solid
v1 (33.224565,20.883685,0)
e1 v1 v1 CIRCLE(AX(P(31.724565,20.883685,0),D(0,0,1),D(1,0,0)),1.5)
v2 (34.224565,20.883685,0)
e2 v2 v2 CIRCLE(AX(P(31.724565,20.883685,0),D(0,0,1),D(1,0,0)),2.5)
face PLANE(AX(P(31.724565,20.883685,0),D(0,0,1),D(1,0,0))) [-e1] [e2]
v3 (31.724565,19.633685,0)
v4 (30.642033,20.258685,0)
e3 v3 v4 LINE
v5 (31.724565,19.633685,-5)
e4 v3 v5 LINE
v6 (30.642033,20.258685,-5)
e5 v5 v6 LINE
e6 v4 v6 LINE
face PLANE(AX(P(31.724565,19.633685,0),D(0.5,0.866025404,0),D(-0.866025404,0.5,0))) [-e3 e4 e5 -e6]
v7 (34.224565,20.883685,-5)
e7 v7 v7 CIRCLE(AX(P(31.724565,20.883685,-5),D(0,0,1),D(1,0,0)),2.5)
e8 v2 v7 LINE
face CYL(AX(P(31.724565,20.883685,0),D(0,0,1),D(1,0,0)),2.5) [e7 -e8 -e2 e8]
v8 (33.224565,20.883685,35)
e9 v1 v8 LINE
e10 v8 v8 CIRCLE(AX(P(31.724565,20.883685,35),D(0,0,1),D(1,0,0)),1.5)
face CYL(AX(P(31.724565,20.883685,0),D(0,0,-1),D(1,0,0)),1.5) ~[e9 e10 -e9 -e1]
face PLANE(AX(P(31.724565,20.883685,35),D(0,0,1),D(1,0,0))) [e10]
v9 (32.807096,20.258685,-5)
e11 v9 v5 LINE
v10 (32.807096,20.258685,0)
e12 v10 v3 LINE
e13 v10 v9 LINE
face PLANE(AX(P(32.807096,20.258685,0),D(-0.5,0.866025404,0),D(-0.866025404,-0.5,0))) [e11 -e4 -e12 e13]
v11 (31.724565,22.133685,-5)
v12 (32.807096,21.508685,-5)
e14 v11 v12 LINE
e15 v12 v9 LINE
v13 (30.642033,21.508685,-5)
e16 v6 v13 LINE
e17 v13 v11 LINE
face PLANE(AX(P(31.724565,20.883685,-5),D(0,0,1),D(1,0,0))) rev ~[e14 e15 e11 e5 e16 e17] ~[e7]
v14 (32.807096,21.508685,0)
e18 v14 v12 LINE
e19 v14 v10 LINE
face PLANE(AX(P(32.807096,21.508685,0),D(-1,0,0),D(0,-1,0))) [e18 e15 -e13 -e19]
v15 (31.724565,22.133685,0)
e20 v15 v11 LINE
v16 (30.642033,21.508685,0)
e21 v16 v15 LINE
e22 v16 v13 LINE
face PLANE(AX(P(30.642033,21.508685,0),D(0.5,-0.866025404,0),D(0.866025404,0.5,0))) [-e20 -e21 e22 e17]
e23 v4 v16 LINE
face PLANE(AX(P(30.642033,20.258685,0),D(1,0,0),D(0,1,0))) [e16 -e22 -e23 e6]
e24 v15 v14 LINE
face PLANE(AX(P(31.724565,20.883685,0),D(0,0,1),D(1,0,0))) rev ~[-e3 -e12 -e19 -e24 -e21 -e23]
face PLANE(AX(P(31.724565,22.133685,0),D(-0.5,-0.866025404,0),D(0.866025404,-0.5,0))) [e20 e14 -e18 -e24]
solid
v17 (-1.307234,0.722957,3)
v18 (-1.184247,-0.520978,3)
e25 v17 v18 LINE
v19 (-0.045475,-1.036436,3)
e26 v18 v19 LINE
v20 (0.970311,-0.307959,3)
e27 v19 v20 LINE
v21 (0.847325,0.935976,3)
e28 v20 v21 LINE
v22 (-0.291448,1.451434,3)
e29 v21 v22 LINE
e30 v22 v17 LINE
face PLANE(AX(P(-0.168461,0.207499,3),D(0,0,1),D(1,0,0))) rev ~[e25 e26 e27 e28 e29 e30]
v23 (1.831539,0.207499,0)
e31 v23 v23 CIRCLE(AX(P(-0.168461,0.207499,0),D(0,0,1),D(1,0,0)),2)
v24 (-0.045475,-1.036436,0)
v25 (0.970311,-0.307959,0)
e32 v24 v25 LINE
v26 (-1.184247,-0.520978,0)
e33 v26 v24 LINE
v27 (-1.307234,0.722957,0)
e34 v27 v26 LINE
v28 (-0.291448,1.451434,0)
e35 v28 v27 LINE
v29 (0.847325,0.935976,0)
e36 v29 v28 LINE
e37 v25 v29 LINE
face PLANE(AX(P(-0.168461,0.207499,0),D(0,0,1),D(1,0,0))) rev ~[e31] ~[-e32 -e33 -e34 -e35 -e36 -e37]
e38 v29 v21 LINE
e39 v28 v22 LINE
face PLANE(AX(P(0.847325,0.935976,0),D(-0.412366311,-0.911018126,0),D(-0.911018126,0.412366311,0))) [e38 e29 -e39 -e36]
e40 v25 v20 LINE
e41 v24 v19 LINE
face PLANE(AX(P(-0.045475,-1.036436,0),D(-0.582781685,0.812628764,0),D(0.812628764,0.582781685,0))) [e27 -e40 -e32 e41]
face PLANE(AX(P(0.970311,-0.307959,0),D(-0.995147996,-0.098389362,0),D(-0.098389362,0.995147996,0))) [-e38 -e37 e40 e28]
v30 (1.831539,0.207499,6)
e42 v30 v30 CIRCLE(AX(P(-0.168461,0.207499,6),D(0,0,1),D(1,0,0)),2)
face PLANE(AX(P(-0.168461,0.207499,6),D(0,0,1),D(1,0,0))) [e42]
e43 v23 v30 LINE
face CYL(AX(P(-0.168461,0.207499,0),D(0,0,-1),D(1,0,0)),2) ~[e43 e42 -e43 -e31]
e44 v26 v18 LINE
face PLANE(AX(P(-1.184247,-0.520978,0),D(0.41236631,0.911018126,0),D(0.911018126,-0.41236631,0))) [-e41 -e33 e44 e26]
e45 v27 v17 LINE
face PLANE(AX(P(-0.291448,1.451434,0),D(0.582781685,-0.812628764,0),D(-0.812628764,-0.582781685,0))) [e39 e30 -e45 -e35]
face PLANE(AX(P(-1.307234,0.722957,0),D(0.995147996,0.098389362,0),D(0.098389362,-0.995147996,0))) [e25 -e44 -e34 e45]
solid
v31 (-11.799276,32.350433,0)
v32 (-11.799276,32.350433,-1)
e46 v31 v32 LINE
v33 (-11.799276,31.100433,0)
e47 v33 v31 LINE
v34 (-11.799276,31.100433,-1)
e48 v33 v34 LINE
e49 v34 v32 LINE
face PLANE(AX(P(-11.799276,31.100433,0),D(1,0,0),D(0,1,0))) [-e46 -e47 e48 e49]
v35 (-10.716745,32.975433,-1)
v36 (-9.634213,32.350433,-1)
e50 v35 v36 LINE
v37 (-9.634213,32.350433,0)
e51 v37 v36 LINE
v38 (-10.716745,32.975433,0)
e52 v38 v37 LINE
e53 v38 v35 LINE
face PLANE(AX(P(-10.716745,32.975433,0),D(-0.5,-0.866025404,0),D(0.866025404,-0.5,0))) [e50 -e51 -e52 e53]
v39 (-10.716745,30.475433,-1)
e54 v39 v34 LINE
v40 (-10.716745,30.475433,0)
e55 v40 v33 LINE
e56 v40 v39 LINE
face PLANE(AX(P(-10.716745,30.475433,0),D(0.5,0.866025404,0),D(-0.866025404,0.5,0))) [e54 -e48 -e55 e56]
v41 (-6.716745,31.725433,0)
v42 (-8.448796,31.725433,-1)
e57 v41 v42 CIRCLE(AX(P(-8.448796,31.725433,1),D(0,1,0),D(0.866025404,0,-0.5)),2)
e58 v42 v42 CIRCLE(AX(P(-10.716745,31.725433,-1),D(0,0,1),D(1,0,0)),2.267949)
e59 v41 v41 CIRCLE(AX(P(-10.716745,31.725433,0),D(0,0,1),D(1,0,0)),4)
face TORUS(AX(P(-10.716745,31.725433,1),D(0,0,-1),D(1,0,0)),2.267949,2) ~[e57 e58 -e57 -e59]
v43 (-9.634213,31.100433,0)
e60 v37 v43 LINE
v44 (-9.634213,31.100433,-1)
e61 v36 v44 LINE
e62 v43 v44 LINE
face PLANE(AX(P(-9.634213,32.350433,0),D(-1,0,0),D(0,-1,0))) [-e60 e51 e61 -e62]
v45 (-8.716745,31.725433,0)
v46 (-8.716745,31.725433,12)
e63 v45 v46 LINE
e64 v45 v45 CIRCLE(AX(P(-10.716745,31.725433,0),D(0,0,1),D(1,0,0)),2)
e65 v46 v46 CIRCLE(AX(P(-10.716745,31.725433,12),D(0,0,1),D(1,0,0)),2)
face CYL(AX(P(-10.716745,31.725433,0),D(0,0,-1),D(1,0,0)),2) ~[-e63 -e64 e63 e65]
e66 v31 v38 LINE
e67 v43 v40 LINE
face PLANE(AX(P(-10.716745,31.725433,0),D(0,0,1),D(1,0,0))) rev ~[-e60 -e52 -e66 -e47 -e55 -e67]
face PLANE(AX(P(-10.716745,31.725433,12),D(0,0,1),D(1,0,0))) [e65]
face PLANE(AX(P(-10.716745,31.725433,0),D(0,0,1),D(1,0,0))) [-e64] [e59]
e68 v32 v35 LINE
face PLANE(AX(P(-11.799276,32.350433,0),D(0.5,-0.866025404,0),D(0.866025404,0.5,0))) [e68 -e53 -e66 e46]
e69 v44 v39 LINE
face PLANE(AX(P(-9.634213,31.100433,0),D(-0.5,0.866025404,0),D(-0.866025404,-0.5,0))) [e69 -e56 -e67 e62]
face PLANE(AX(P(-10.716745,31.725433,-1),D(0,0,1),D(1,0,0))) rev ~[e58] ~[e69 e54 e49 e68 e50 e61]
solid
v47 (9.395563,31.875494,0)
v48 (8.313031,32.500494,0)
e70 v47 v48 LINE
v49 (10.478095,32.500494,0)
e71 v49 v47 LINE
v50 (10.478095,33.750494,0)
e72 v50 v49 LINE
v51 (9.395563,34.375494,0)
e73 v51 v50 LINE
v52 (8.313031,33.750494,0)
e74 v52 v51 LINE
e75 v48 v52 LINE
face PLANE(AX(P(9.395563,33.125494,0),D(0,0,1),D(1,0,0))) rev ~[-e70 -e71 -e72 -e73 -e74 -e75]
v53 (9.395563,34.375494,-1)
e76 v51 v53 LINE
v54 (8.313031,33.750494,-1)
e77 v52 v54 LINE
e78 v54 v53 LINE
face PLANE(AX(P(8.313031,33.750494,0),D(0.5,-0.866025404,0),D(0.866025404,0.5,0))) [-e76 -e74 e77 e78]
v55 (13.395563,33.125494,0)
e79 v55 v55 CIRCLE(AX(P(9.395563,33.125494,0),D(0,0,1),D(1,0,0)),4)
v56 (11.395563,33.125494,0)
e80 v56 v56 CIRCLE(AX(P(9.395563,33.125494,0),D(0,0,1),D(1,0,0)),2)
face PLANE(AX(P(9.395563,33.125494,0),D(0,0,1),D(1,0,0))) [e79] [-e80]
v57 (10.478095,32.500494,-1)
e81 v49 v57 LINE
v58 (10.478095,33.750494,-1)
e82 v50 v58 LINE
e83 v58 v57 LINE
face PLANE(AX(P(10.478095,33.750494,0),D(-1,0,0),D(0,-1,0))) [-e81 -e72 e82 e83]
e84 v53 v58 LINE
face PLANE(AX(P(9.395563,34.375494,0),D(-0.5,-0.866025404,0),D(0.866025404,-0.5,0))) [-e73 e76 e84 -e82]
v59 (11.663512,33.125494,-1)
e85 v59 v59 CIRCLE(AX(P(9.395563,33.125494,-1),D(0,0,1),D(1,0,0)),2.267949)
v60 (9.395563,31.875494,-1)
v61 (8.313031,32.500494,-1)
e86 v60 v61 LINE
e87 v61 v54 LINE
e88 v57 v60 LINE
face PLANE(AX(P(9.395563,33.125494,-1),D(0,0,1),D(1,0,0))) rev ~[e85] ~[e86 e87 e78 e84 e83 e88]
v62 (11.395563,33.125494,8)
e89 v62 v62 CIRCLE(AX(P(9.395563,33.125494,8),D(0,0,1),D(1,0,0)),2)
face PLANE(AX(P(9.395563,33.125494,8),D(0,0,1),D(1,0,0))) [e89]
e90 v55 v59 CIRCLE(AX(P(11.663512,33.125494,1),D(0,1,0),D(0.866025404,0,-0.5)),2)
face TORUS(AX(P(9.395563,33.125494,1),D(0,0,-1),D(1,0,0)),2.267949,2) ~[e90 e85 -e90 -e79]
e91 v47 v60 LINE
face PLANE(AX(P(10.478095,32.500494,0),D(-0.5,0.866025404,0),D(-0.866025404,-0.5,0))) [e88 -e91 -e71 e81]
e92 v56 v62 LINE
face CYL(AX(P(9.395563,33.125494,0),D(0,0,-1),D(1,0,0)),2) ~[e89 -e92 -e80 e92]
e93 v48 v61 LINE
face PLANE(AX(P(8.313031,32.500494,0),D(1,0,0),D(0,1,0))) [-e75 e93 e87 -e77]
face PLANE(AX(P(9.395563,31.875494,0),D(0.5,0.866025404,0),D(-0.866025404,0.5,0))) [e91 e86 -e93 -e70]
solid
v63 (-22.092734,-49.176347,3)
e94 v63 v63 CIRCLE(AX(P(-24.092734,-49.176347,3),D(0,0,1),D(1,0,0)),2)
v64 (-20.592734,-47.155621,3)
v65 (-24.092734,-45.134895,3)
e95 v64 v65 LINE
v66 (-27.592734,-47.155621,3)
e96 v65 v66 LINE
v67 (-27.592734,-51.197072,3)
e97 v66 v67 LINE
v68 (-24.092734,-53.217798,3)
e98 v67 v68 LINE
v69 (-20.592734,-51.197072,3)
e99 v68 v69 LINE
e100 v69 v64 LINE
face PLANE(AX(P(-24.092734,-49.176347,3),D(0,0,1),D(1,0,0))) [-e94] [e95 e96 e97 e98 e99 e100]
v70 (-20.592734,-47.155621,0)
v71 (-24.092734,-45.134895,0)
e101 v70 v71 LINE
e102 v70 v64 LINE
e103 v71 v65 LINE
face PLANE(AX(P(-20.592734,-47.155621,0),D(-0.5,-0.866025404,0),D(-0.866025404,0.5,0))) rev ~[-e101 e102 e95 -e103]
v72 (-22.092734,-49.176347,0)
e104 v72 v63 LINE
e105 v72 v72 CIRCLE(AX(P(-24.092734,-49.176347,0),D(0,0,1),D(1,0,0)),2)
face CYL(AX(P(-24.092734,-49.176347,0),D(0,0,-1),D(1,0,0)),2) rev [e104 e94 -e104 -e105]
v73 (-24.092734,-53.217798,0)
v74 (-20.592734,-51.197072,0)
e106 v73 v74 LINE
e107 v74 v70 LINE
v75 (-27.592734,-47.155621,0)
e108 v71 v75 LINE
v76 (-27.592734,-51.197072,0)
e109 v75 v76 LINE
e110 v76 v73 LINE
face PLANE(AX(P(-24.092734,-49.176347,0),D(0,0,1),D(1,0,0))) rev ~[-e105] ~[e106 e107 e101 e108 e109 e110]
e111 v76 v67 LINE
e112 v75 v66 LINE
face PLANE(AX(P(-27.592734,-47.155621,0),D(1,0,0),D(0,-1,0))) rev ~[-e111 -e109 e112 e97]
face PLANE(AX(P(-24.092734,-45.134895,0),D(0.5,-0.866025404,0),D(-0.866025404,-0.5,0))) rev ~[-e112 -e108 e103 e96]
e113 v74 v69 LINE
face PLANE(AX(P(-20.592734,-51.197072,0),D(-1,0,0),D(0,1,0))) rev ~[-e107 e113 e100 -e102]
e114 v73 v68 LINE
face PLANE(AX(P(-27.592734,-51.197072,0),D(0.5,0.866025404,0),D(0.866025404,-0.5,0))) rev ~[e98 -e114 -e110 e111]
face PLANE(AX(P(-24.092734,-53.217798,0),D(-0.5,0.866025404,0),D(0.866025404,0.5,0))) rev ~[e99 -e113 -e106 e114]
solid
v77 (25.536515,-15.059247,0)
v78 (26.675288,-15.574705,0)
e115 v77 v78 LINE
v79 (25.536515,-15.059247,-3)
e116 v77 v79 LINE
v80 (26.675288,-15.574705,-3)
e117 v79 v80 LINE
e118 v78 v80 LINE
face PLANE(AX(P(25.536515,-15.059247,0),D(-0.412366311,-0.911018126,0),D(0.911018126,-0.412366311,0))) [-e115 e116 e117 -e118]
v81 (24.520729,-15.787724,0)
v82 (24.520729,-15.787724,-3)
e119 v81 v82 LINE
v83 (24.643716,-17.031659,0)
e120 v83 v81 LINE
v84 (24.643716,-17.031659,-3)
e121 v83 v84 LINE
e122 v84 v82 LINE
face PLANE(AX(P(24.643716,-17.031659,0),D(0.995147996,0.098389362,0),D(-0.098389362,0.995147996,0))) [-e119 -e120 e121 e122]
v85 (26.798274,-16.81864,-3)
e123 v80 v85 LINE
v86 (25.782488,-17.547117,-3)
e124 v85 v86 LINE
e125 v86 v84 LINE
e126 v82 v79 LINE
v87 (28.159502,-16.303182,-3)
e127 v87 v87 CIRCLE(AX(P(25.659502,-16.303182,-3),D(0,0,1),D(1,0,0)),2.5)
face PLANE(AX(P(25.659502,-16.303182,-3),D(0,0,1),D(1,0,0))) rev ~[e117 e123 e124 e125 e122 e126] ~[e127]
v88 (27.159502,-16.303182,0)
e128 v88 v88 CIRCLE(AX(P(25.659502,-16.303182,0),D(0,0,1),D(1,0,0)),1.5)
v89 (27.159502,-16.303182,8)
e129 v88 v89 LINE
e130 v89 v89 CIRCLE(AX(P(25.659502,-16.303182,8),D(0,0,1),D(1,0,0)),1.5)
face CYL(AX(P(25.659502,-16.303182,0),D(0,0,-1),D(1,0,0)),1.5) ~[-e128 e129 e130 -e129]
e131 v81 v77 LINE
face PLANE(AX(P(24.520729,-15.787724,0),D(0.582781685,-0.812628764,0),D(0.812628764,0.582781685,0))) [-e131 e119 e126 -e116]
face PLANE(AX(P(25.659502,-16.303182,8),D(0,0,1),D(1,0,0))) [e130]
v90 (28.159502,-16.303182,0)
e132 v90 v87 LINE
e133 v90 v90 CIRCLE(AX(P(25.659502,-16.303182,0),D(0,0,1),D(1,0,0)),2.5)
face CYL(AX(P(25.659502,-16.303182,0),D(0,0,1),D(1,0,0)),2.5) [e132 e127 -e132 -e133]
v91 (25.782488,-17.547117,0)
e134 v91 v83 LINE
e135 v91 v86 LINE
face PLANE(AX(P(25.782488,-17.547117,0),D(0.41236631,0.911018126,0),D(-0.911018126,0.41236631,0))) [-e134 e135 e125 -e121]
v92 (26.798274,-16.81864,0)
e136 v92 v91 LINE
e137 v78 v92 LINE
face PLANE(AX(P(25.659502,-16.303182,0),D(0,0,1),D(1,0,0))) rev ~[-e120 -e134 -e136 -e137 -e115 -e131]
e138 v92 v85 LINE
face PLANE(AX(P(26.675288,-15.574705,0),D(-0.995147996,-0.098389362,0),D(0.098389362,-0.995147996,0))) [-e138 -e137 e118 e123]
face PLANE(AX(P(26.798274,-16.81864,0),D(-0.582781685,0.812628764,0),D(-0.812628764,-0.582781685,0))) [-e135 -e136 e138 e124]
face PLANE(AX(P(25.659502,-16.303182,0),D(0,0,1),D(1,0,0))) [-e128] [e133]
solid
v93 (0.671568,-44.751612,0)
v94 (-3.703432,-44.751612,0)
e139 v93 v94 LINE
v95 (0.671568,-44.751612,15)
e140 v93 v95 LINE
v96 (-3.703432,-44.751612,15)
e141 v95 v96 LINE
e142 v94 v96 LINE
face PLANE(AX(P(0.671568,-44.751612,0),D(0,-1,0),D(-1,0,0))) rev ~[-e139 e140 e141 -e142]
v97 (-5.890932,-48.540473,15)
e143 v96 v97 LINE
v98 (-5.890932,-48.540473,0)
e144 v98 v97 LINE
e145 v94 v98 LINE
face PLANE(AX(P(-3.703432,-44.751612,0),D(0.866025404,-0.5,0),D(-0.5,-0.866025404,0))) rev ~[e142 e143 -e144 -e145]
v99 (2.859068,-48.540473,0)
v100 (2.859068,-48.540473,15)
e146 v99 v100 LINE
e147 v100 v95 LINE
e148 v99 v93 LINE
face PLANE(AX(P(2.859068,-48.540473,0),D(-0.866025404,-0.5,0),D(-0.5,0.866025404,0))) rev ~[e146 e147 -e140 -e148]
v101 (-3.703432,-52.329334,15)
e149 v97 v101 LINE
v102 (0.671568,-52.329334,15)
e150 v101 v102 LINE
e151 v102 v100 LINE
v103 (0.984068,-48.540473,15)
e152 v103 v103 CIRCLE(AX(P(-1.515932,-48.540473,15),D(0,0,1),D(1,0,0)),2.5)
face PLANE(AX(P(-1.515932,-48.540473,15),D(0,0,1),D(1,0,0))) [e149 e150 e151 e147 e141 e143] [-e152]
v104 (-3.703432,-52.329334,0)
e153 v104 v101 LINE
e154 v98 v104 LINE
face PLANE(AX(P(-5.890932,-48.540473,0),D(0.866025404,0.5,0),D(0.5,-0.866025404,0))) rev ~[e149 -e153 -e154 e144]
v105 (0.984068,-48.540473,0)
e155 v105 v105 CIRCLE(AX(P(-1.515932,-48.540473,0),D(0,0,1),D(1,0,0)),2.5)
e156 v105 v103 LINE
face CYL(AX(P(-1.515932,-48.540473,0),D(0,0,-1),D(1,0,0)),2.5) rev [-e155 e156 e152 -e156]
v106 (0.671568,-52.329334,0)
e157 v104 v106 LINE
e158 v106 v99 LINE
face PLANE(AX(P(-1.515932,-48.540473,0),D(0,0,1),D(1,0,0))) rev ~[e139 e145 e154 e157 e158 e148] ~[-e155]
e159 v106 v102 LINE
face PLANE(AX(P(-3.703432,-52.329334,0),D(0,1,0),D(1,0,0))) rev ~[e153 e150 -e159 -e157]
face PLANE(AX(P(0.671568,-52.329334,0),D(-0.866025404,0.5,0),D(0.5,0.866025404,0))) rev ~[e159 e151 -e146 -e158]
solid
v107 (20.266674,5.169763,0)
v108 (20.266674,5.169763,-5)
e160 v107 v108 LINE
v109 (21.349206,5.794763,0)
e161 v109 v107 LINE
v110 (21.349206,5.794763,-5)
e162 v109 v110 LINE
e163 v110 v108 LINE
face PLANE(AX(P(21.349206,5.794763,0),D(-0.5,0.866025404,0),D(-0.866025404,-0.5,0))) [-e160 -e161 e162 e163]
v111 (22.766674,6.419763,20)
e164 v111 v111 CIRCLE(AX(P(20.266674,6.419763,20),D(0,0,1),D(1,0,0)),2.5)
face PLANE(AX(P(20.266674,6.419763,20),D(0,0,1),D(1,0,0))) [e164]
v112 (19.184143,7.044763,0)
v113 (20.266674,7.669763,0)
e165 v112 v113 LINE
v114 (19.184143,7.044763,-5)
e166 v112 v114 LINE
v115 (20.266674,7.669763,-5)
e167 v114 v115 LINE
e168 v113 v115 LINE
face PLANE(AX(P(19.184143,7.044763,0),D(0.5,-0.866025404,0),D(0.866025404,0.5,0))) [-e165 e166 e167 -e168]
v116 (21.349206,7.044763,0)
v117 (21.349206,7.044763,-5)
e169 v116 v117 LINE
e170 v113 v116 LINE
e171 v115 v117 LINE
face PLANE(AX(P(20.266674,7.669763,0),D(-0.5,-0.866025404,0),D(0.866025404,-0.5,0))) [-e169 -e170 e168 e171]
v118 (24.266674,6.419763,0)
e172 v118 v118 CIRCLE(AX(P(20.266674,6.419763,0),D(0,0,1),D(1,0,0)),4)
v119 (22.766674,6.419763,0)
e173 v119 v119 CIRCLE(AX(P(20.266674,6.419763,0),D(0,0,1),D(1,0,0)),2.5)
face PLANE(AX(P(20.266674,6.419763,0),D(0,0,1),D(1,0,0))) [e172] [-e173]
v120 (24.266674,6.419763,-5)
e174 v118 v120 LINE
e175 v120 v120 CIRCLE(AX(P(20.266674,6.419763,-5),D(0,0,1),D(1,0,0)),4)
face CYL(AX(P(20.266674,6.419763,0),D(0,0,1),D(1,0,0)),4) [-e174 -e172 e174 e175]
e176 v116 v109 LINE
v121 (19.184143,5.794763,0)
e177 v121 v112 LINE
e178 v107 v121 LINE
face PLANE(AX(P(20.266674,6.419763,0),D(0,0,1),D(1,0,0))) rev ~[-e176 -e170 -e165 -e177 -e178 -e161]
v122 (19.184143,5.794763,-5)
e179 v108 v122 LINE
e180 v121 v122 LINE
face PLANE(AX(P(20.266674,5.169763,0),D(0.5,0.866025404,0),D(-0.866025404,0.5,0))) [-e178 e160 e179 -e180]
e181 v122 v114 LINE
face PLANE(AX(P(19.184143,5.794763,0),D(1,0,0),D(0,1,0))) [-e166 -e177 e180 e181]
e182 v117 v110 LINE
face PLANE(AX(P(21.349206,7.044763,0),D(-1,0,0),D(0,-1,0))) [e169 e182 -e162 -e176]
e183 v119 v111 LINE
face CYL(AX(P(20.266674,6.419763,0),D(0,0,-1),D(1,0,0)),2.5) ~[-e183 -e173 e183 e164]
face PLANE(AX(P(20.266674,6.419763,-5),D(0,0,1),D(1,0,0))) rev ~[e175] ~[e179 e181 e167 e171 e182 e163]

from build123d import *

# Parameters (mm, degrees)
F0_R      = 2
F1_DEPTH  = 6
F0_R_2    = 1.5
F2_DEPTH  = 8
F0_R_3    = 2.5
F3_DEPTH  = 3
F4_DEPTH  = 20
F0_R_4    = 4
F5_DEPTH  = 5
F6_DEPTH  = 3
F7_DEPTH  = 8
F8_DEPTH  = 1
F10_DEPTH = 35
F11_DEPTH = 3
F12_DEPTH = 12
F13_DEPTH = 15


# Not quite as in the source:
# - a fillet or chamfer that OpenCascade refuses, or shapes differently, is made with other operations: its cross-section is extruded or revolved along the edge and cut away or added


with BuildPart() as f1:
    # F0 (on Top) → F1 (new body)
    with BuildSketch(Plane.XY):
        with Locations((-0.1684613526, 0.2074986696)):
            Circle(F0_R)
        Polygon((-1.3072340101, 0.7229565578), (-0.2914480557, 1.4514336643), (0.8473246019, 0.9359757761), (0.970311305, -0.3079592185), (-0.0454746495, -1.036436325), (-1.1842473071, -0.5209784369), align=None, mode=Mode.SUBTRACT)
        Polygon((0.8473246019, 0.9359757761), (-0.2914480557, 1.4514336643), (-1.3072340101, 0.7229565578), (-1.1842473071, -0.5209784369), (-0.0454746495, -1.036436325), (0.970311305, -0.3079592185), align=None)
    extrude(amount=F1_DEPTH)

    # F0 (on Top) → F6 (cut)
    with BuildSketch(Plane.XY):
        Polygon((0.8473246019, 0.9359757761), (-0.2914480557, 1.4514336643), (-1.3072340101, 0.7229565578), (-1.1842473071, -0.5209784369), (-0.0454746495, -1.036436325), (0.970311305, -0.3079592185), align=None)
    extrude(amount=F6_DEPTH, mode=Mode.SUBTRACT)


with BuildPart() as f2:
    # F0 (on Top) → F2 (new body)
    with BuildSketch(Plane.XY):
        with Locations((25.6595015526, -16.3031816483)):
            Circle(F0_R_2)
        Polygon((24.520728895, -15.7877237601), (25.5365148495, -15.0592466536), (26.6752875071, -15.5747045418), (26.7982742101, -16.8186395364), (25.7824882557, -17.5471166429), (24.6437155981, -17.0316587548), align=None, mode=Mode.SUBTRACT)
        Polygon((26.6752875071, -15.5747045418), (25.5365148495, -15.0592466536), (24.520728895, -15.7877237601), (24.6437155981, -17.0316587548), (25.7824882557, -17.5471166429), (26.7982742101, -16.8186395364), align=None)
    extrude(amount=F2_DEPTH)

    # F0 (on Top) → F3 (join)
    with BuildSketch(Plane.XY):
        with Locations((25.6595015526, -16.3031816483)):
            Circle(F0_R_3)
        with Locations((25.6595015526, -16.3031816483)):
            Circle(F0_R_2, mode=Mode.SUBTRACT)
        with Locations((25.6595015526, -16.3031816483)):
            Circle(F0_R_2)
        Polygon((24.520728895, -15.7877237601), (25.5365148495, -15.0592466536), (26.6752875071, -15.5747045418), (26.7982742101, -16.8186395364), (25.7824882557, -17.5471166429), (24.6437155981, -17.0316587548), align=None, mode=Mode.SUBTRACT)
    extrude(amount=-F3_DEPTH)


with BuildPart() as f4:
    # F0 (on Top) → F4 (new body)
    with BuildSketch(Plane.XY):
        with Locations((20.266674459, 6.419762969)):
            Circle(F0_R_3)
        Polygon((19.1841427043, 7.044762969), (20.266674459, 7.669762969), (21.3492062137, 7.044762969), (21.3492062137, 5.794762969), (20.266674459, 5.169762969), (19.1841427043, 5.794762969), align=None, mode=Mode.SUBTRACT)
        Polygon((21.3492062137, 7.044762969), (20.266674459, 7.669762969), (19.1841427043, 7.044762969), (19.1841427043, 5.794762969), (20.266674459, 5.169762969), (21.3492062137, 5.794762969), align=None)
    extrude(amount=F4_DEPTH)

    # F0 (on Top) → F5 (join)
    with BuildSketch(Plane.XY):
        with Locations((20.266674459, 6.419762969)):
            Circle(F0_R_4)
        with Locations((20.266674459, 6.419762969)):
            Circle(F0_R_3, mode=Mode.SUBTRACT)
        with Locations((20.266674459, 6.419762969)):
            Circle(F0_R_3)
        Polygon((19.1841427043, 7.044762969), (20.266674459, 7.669762969), (21.3492062137, 7.044762969), (21.3492062137, 5.794762969), (20.266674459, 5.169762969), (19.1841427043, 5.794762969), align=None, mode=Mode.SUBTRACT)
    extrude(amount=-F5_DEPTH)


with BuildPart() as f5:
    # F0 (on Top) → F5, piece 2 (new body)
    with BuildSketch(Plane.XY):
        with Locations((31.7245647311, 20.8836849779)):
            Circle(F0_R_3)
        with Locations((31.7245647311, 20.8836849779)):
            Circle(F0_R_2, mode=Mode.SUBTRACT)
        with Locations((31.7245647311, 20.8836849779)):
            Circle(F0_R_2)
        Polygon((30.6420329764, 21.5086849779), (31.7245647311, 22.1336849779), (32.8070964859, 21.5086849779), (32.8070964859, 20.2586849779), (31.7245647311, 19.6336849779), (30.6420329764, 20.2586849779), align=None, mode=Mode.SUBTRACT)
    extrude(amount=-F5_DEPTH)

    # F0 (on Top) → F10 (join)
    with BuildSketch(Plane.XY):
        with Locations((31.7245647311, 20.8836849779)):
            Circle(F0_R_2)
        Polygon((30.6420329764, 21.5086849779), (31.7245647311, 22.1336849779), (32.8070964859, 21.5086849779), (32.8070964859, 20.2586849779), (31.7245647311, 19.6336849779), (30.6420329764, 20.2586849779), align=None, mode=Mode.SUBTRACT)
        Polygon((32.8070964859, 21.5086849779), (31.7245647311, 22.1336849779), (30.6420329764, 21.5086849779), (30.6420329764, 20.2586849779), (31.7245647311, 19.6336849779), (32.8070964859, 20.2586849779), align=None)
    extrude(amount=F10_DEPTH)


with BuildPart() as f7:
    # F0 (on Top) → F7 (new body)
    with BuildSketch(Plane.XY):
        with Locations((9.3955630437, 33.1254936755)):
            Circle(F0_R)
        Polygon((8.3130312889, 33.7504936755), (9.3955630437, 34.3754936755), (10.4780947984, 33.7504936755), (10.4780947984, 32.5004936755), (9.3955630437, 31.8754936755), (8.3130312889, 32.5004936755), align=None, mode=Mode.SUBTRACT)
        Polygon((10.4780947984, 33.7504936755), (9.3955630437, 34.3754936755), (8.3130312889, 33.7504936755), (8.3130312889, 32.5004936755), (9.3955630437, 31.8754936755), (10.4780947984, 32.5004936755), align=None)
    extrude(amount=F7_DEPTH)

    # F0 (on Top) → F8 (join)
    with BuildSketch(Plane.XY):
        with Locations((9.3955630437, 33.1254936755)):
            Circle(F0_R_4)
        with Locations((9.3955630437, 33.1254936755)):
            Circle(F0_R, mode=Mode.SUBTRACT)
        with Locations((9.3955630437, 33.1254936755)):
            Circle(F0_R)
        Polygon((8.3130312889, 33.7504936755), (9.3955630437, 34.3754936755), (10.4780947984, 33.7504936755), (10.4780947984, 32.5004936755), (9.3955630437, 31.8754936755), (8.3130312889, 32.5004936755), align=None, mode=Mode.SUBTRACT)
    extrude(amount=-F8_DEPTH)

    # F9: fillet of radius 2 on 1 edges, made by hand

    # F9_s1 → F9_t2 (revolve, cut)
    with BuildSketch(Plane.XZ.offset(-33.1254936755)):
        with BuildLine():
            ThreePointArc((13.3955630437, 0), (12.6635122361, -0.7320508076), (11.6635122361, -1))
            Line((11.6635122361, -1), (13.3955630437, -1))
            Line((13.3955630437, -1), (13.3955630437, 0))
        make_face()
    revolve(axis=Axis((9.3955630437, 33.1254936755, -1), (0, 0, 1)), mode=Mode.SUBTRACT)


with BuildPart() as f8:
    # F0 (on Top) → F8, piece 2 (new body)
    with BuildSketch(Plane.XY):
        with Locations((-10.7167446986, 31.7254327238)):
            Circle(F0_R_4)
        with Locations((-10.7167446986, 31.7254327238)):
            Circle(F0_R, mode=Mode.SUBTRACT)
        with Locations((-10.7167446986, 31.7254327238)):
            Circle(F0_R)
        Polygon((-11.7992764533, 32.3504327238), (-10.7167446986, 32.9754327238), (-9.6342129439, 32.3504327238), (-9.6342129439, 31.1004327238), (-10.7167446986, 30.4754327238), (-11.7992764533, 31.1004327238), align=None, mode=Mode.SUBTRACT)
    extrude(amount=-F8_DEPTH)

    # F9#2: fillet of radius 2 on 1 edges, made by hand

    # F9_2_s1 → F9_2_t2 (revolve, cut)
    with BuildSketch(Plane.XZ.offset(-31.7254327238)):
        with BuildLine():
            ThreePointArc((-6.7167446986, 0), (-7.4487955062, -0.7320508076), (-8.4487955062, -1))
            Line((-8.4487955062, -1), (-6.7167446986, -1))
            Line((-6.7167446986, -1), (-6.7167446986, 0))
        make_face()
    revolve(axis=Axis((-10.7167446986, 31.7254327238, -1), (0, 0, 1)), mode=Mode.SUBTRACT)

    # F0 (on Top) → F12 (join)
    with BuildSketch(Plane.XY):
        with Locations((-10.7167446986, 31.7254327238)):
            Circle(F0_R)
        Polygon((-11.7992764533, 32.3504327238), (-10.7167446986, 32.9754327238), (-9.6342129439, 32.3504327238), (-9.6342129439, 31.1004327238), (-10.7167446986, 30.4754327238), (-11.7992764533, 31.1004327238), align=None, mode=Mode.SUBTRACT)
        Polygon((-9.6342129439, 32.3504327238), (-10.7167446986, 32.9754327238), (-11.7992764533, 32.3504327238), (-11.7992764533, 31.1004327238), (-10.7167446986, 30.4754327238), (-9.6342129439, 31.1004327238), align=None)
    extrude(amount=F12_DEPTH)


with BuildPart() as f11:
    # F0 (on Top) → F11 (new body)
    with BuildSketch(Plane.XY):
        Polygon((-20.59273386, -51.1970724528), (-20.59273386, -47.1556205685), (-24.09273386, -45.1348946263), (-27.59273386, -47.1556205685), (-27.59273386, -51.1970724528), (-24.09273386, -53.217798395), align=None)
        with Locations((-24.09273386, -49.1763465106)):
            Circle(F0_R, mode=Mode.SUBTRACT)
    extrude(amount=F11_DEPTH)


with BuildPart() as f13:
    # F0 (on Top) → F13 (new body)
    with BuildSketch(Plane.XY):
        Polygon((0.6715684338, -52.3293341259), (2.8590684338, -48.5404729843), (0.6715684338, -44.7516118428), (-3.7034315662, -44.7516118428), (-5.8909315662, -48.5404729843), (-3.7034315662, -52.3293341259), align=None)
        with Locations((-1.5159315662, -48.5404729843)):
            Circle(F0_R_3, mode=Mode.SUBTRACT)
    extrude(amount=F13_DEPTH)


solid = Compound([f1.part, f2.part, f4.part, f5.part, f7.part, f8.part, f11.part, f13.part])
